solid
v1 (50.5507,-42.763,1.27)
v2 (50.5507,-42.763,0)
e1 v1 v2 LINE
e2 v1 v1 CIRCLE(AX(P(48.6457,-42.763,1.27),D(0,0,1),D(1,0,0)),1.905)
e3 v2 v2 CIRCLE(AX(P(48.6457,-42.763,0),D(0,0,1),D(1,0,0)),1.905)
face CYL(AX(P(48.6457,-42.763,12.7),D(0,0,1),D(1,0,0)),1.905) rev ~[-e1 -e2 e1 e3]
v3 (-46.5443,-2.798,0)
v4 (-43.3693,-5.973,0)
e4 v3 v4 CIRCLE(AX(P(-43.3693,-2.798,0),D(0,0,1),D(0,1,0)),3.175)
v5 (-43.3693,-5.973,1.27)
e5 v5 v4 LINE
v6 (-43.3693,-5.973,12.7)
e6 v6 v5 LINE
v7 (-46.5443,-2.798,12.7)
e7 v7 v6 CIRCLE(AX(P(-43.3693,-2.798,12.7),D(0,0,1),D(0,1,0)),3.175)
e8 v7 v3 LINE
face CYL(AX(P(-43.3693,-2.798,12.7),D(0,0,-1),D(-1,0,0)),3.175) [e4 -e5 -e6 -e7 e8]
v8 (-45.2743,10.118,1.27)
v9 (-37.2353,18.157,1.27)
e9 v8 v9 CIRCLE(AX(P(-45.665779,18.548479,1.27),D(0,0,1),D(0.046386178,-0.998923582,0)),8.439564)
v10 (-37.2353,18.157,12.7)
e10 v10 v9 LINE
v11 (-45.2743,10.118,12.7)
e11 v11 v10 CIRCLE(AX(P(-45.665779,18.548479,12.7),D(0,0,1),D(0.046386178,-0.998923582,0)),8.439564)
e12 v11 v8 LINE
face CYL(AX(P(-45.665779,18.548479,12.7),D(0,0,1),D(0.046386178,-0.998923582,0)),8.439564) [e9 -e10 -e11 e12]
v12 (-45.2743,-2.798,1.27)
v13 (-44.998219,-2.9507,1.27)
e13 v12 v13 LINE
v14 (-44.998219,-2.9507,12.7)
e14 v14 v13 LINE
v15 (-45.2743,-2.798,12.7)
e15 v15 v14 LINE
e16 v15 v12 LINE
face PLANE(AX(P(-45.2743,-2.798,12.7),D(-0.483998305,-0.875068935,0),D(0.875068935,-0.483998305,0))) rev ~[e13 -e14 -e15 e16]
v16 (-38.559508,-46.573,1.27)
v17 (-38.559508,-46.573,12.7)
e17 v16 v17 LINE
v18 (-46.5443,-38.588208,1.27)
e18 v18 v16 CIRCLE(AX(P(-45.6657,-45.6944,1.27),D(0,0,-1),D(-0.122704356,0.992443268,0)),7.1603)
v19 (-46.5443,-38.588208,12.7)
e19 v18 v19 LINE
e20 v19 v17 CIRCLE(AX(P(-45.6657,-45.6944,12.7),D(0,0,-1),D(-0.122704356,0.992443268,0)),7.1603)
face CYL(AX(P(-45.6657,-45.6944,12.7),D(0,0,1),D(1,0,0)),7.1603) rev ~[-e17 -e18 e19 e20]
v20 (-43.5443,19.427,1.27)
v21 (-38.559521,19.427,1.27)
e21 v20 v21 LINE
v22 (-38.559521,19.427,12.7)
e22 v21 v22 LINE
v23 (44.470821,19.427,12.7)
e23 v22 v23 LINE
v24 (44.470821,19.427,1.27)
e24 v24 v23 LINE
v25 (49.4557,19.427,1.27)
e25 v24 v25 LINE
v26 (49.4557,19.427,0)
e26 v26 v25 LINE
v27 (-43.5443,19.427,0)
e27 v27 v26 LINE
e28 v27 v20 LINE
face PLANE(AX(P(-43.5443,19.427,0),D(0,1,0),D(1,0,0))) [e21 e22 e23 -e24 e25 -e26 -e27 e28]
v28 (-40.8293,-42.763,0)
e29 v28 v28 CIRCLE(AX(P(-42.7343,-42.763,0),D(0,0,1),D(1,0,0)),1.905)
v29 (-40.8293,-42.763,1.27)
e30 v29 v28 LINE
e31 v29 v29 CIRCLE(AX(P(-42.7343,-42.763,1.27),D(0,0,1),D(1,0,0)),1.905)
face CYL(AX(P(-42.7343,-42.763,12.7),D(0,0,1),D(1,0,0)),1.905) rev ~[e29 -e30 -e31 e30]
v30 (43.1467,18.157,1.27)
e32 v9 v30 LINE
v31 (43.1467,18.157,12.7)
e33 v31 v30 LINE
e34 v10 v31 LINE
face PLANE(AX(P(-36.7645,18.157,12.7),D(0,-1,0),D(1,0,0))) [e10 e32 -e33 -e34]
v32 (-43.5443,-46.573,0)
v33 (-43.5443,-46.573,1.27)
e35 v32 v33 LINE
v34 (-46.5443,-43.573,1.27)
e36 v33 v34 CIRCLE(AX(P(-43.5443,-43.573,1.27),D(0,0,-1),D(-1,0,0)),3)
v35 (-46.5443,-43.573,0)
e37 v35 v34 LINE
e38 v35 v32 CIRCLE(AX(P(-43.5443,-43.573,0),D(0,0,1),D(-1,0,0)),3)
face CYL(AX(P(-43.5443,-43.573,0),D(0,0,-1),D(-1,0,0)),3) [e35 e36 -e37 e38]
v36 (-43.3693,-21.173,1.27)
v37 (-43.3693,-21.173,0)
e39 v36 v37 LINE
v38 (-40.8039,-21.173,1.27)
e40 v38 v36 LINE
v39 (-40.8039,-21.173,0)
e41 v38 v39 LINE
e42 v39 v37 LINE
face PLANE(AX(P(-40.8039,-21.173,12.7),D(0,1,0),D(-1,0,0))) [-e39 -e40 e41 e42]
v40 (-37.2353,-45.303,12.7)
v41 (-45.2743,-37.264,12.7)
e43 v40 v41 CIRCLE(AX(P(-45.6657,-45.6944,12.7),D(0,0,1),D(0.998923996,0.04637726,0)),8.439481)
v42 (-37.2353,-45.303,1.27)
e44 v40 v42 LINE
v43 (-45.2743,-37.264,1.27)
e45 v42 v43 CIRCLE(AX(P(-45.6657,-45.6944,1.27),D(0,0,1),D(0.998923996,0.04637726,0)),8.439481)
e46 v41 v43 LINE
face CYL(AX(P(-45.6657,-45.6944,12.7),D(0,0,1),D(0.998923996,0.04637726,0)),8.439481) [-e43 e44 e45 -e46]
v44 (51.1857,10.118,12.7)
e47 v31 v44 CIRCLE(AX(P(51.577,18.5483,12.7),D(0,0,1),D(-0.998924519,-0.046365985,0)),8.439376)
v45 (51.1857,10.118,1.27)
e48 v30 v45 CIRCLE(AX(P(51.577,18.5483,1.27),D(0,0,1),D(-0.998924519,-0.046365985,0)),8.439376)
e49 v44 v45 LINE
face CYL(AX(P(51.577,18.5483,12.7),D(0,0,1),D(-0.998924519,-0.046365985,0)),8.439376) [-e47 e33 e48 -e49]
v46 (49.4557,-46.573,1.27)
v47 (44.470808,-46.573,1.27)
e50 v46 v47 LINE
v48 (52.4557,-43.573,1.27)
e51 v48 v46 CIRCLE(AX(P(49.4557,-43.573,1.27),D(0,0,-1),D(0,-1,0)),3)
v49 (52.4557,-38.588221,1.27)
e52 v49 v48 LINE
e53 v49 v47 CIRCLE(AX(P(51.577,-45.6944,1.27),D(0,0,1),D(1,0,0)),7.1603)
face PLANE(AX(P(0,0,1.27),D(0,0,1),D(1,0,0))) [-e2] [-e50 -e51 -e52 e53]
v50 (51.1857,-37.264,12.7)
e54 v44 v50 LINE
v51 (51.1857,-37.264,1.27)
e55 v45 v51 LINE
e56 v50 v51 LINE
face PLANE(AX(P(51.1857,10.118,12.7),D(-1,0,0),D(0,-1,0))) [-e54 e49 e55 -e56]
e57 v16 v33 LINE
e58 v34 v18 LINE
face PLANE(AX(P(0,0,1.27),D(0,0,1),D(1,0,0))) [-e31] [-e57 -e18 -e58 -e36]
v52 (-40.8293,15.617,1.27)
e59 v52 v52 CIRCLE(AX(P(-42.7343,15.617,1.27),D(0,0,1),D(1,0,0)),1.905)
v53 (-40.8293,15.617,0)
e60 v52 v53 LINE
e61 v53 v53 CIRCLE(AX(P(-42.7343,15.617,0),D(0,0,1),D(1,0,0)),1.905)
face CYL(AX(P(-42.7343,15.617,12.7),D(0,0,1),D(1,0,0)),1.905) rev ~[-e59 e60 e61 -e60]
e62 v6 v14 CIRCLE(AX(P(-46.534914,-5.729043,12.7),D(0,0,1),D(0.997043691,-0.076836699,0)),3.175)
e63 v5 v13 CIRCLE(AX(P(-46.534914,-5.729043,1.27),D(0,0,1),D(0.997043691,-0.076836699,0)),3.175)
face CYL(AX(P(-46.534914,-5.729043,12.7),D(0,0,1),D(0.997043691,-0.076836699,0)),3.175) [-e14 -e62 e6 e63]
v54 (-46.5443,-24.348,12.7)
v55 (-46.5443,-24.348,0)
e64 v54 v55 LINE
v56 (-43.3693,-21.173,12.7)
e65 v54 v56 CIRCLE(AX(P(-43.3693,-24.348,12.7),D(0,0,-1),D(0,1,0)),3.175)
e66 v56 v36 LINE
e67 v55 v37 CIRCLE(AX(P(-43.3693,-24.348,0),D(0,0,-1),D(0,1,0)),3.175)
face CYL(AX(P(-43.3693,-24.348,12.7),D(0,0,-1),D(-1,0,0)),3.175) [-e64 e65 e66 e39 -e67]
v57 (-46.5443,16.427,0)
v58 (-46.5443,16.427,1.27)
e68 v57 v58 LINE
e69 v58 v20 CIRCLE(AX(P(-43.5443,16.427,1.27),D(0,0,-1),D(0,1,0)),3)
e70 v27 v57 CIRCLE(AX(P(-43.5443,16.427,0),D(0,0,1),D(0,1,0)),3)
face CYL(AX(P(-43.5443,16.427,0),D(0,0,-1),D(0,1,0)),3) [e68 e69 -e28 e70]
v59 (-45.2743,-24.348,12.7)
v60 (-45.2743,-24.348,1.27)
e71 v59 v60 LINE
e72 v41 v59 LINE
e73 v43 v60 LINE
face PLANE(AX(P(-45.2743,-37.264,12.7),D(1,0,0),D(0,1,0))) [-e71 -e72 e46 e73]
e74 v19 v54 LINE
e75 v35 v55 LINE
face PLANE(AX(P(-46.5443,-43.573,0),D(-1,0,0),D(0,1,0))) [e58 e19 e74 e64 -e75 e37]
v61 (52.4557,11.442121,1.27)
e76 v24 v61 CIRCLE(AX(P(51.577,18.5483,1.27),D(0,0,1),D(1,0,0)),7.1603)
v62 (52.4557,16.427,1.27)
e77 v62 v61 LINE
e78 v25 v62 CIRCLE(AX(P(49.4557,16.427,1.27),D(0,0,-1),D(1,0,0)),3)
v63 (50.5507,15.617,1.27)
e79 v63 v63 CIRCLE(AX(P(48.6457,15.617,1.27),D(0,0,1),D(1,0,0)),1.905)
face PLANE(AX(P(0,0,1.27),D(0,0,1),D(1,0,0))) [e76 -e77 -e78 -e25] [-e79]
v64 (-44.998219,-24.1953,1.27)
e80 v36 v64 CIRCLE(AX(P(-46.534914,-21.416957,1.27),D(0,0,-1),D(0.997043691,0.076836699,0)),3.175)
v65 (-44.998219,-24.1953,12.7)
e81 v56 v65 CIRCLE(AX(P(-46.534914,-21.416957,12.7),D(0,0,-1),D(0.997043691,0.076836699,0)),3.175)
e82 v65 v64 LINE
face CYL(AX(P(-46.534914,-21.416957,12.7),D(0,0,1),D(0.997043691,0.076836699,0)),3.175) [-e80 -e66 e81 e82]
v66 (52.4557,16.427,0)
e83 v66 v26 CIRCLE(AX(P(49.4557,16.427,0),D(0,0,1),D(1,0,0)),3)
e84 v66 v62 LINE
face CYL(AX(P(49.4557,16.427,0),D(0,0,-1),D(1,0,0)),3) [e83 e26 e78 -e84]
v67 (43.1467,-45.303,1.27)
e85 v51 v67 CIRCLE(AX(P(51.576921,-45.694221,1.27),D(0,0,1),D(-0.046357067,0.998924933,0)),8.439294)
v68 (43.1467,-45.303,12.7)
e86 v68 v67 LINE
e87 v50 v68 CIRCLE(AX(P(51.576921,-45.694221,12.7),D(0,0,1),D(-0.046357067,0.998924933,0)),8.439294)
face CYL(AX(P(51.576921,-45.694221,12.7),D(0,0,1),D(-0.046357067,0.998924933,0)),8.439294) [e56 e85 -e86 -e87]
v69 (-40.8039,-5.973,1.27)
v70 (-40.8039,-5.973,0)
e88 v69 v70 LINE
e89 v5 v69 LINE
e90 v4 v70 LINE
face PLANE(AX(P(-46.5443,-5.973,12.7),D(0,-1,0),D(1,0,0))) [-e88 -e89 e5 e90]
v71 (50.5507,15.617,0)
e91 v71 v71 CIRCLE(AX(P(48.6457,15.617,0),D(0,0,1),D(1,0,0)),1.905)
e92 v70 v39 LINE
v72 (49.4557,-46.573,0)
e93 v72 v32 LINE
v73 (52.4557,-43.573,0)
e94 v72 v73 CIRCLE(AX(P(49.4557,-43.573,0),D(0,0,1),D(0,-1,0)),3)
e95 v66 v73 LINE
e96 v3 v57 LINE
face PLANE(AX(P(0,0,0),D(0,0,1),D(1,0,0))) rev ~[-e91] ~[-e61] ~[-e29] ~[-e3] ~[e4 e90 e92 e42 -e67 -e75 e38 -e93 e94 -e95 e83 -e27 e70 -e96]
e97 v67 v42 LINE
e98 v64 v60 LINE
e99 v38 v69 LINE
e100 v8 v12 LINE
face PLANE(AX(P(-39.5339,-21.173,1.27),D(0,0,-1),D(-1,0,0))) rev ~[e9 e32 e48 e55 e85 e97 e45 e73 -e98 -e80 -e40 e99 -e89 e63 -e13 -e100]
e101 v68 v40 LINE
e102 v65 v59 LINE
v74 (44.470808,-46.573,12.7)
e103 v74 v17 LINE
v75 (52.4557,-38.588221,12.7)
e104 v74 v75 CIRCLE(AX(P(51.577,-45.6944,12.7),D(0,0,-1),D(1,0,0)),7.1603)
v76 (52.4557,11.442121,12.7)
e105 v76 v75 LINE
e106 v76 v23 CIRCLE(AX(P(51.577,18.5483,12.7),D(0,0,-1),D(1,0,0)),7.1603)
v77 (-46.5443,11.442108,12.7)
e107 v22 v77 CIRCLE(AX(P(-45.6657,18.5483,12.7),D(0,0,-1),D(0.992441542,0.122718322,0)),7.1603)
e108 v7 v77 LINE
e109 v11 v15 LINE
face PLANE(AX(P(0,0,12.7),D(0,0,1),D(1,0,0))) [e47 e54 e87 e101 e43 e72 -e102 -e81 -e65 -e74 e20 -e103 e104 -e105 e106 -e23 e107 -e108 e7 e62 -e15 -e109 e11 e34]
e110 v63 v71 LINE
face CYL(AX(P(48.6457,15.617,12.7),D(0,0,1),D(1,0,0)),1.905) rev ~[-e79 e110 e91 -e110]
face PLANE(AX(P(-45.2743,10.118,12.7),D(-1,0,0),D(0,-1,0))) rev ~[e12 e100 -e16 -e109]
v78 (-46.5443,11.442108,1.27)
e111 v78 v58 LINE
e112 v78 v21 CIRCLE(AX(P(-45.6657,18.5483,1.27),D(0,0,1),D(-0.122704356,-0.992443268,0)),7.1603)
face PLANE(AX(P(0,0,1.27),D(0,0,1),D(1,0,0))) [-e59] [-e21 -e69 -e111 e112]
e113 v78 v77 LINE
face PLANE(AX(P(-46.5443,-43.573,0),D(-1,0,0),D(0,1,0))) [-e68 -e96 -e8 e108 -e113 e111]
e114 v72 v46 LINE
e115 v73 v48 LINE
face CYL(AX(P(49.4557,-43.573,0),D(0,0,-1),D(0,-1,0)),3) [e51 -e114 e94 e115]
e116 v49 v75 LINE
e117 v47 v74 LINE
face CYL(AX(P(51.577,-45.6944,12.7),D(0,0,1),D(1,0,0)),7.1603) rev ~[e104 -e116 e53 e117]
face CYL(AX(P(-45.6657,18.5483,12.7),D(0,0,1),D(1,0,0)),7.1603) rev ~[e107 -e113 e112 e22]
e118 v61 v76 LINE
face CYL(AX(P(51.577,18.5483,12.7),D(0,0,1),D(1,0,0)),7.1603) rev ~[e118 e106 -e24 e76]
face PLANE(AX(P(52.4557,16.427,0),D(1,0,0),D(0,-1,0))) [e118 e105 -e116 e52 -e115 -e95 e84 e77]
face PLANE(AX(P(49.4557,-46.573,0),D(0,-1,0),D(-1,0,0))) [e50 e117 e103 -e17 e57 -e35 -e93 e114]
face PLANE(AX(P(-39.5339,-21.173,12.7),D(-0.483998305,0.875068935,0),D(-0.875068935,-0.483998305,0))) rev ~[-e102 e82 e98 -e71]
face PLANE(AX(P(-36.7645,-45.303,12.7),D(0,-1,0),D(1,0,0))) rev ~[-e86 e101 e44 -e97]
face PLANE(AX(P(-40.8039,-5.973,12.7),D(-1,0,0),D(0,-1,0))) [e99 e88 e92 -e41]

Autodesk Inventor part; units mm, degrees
ref_plane "YZ Plane" through (0, 0, 0) normal (1, 0, 0) x (0, 1, 0)
ref_plane "XZ Plane" through (0, 0, 0) normal (0, 1, 0) x (-1, 0, 0)
ref_plane "XY Plane" through (0, 0, 0) normal (0, 0, 1) x (1, 0, 0)
sketch "Sketch1" plane through (0, 0, 0) normal (0, 0, 1) x (1, 0, 0)
  line L0 (-43.5443, 19.427) -> (49.4557, 19.427)
  line L1 (52.4557, 16.427) -> (52.4557, -43.573)
  line L2 (49.4557, -46.573) -> (-43.5443, -46.573)
  line L3 (-46.5443, -43.573) -> (-46.5443, 16.427)
  arc A0 (-43.5443, 19.427) -> (-46.5443, 16.427) centre (-43.5443, 16.427) ccw
  arc A1 (-46.5443, -43.573) -> (-43.5443, -46.573) centre (-43.5443, -43.573) ccw
  arc A2 (49.4557, -46.573) -> (52.4557, -43.573) centre (49.4557, -43.573) ccw
  arc A3 (52.4557, 16.427) -> (49.4557, 19.427) centre (49.4557, 16.427) ccw
  point P0 (0, 0)
  point P1 (0, 0)
  point P2 (-46.5443, 19.427)
  point P3 (52.4557, -46.573)
  point P4 (52.4557, 19.427)
  dimension "d0" = 99
  dimension "d1" = 66
  dimension "d2" = 3
extrude "Extrusion1" add sketch "Sketch1" along normal blind 12.7
sketch "Sketch2" plane through (0, 0, 12.7) normal (0, 0, 1) x (1, 0, 0)
  line L0 (-46.5443, 16.427) -> (-46.5443, -43.573) projected
  line L1 (49.4557, 19.427) -> (-43.5443, 19.427) projected
  circle A0 centre (-42.7343, 15.617) radius 1.905
  line L2 (-50.0562, -13.573) -> (79.0191, -13.573) construction
  line L3 (2.9557, 30.2203) -> (2.9557, -48.7988) construction
  circle A1 centre (-42.7343, -42.763) radius 1.905
  circle A2 centre (48.6457, 15.617) radius 1.905
  circle A3 centre (48.6457, -42.763) radius 1.905
  point P0 (0, 0)
  dimension "d8" = 3.81
  dimension "d9" = 3.81
  dimension "d10" = 3.81
  dimension "d50" = 3.81
  dimension "d51" = 3.81
  dimension "d52" = 3.81
extrude "Extrusion2" cut sketch "Sketch2" against normal blind 25.4
sketch "Sketch3" plane through (0, 0, 12.7) normal (0, 0, 1) x (1, 0, 0)
  circle A0 centre (48.6457, 15.617) radius 1.905 projected
  circle A1 centre (-42.7343, 15.617) radius 1.905 projected
  circle A2 centre (-42.7343, -42.763) radius 1.905 projected
  circle A3 centre (48.6457, -42.763) radius 1.905 projected
  line L0 (49.4557, 19.427) -> (-43.5443, 19.427) projected
  arc A4 (-43.5443, 19.427) -> (-46.5443, 16.427) centre (-43.5443, 16.427) ccw projected
  line L1 (-46.5443, 16.427) -> (-46.5443, -43.573) construction
  arc A5 (-46.5443, -43.573) -> (-43.5443, -46.573) centre (-43.5443, -43.573) ccw projected
  line L2 (-43.5443, -46.573) -> (49.4557, -46.573) projected
  arc A6 (49.4557, -46.573) -> (52.4557, -43.573) centre (49.4557, -43.573) ccw projected
  line L3 (52.4557, -43.573) -> (52.4557, 16.427) projected
  arc A7 (52.4557, 16.427) -> (49.4557, 19.427) centre (49.4557, 16.427) ccw projected
  arc A8 (-43.5443, 19.427) -> (-46.5443, 16.427) centre (-43.5443, 16.427) ccw projected
  line L4 (49.4557, 19.427) -> (-43.5443, 19.427) projected
  circle A9 centre (48.6457, 15.617) radius 1.905 projected
  circle A10 centre (-42.7343, 15.617) radius 1.905 projected
  circle A11 centre (-42.7343, -42.763) radius 1.905 projected
  circle A12 centre (48.6457, -42.763) radius 1.905 projected
  arc A13 (52.4557, 16.427) -> (49.4557, 19.427) centre (49.4557, 16.427) ccw projected
  line L5 (52.4557, 16.427) -> (52.4557, -43.573) projected
  arc A14 (49.4557, -46.573) -> (52.4557, -43.573) centre (49.4557, -43.573) ccw projected
  line L6 (49.4557, -46.573) -> (-43.5443, -46.573) projected
  arc A15 (-46.5443, -43.573) -> (-43.5443, -46.573) centre (-43.5443, -43.573) ccw projected
  line L7 (-46.5443, -43.573) -> (-46.5443, 16.427) projected
  arc A16 (-43.5443, 19.427) -> (-46.5443, 16.427) centre (-43.5443, 16.427) ccw projected
  line L8 (-43.5443, 19.427) -> (49.4557, 19.427) projected
  line L9 (-43.5443, 19.427) -> (49.4557, 19.427) projected
  line L10 (-40.8039, 19.427) -> (-40.8039, -46.573) construction
  line L11 (49.4557, -46.573) -> (-43.5443, -46.573) projected
  line L12 (-40.8039, 19.427) -> (-51.3078, 19.427) construction
  line L13 (-40.8039, -46.573) -> (-51.3078, -46.573) construction
  line L14 (-40.8039, -21.173) -> (-51.3078, -21.173) construction
  line L15 (-40.8039, -5.973) -> (-51.3078, -5.973) construction
  line L16 (-46.5443, -43.573) -> (-46.5443, 16.427) projected
  line L17 (-46.5443, -5.973) -> (-40.8039, -5.973)
  line L18 (-40.8039, -5.973) -> (-40.8039, -21.173)
  line L19 (-40.8039, -21.173) -> (-46.5443, -21.173)
  line L20 (-46.5443, -21.173) -> (-46.5443, -5.973)
  point P0 (0, 0)
  dimension "d13" = 25.4
  dimension "d14" = 25.4
  dimension "d15" = 5.7404
extrude "Extrusion3" cut sketch "Sketch3" against normal blind 25.4 contours L17 L18 L19 L7
fillet "Fillet1" radius 3.175 2 edges at (-46.5443, -21.173, 6.35) (-46.5443, -5.973, 6.35)
sketch "Sketch9" plane through (0, 0, 12.7) normal (0, 0, 1) x (1, 0, 0)
  arc A0 (-43.5443, 19.427) -> (-46.5443, 16.427) centre (-43.5443, 16.427) ccw projected
  line L0 (-46.5443, -2.798) -> (-46.5443, 16.427) construction
  line L1 (-46.5443, 16.427) -> (-46.5443, -2.798)
  line L2 (-43.5443, 19.427) -> (-26.5771, 19.427) construction
  line L3 (49.4557, 19.427) -> (-43.5443, 19.427) projected
  line L4 (-45.6657, 18.5483) -> (-26.5771, -0.5403) construction
  line L5 (-45.6657, 18.5483) -> (-18.6704, 18.5483) construction
  circle A1 centre (-45.6657, 18.5483) radius 7.1603
  arc A2 (-46.5443, -2.798) -> (-43.3693, -5.973) centre (-43.3693, -2.798) ccw projected
  line L6 (-43.3693, -5.973) -> (-40.8039, -5.973) projected
  line L7 (-40.8039, -5.973) -> (-40.8039, -21.173) projected
  line L8 (-40.8039, -21.173) -> (-43.3693, -21.173) projected
  arc A3 (-43.3693, -21.173) -> (-46.5443, -24.348) centre (-43.3693, -24.348) ccw projected
  line L9 (-46.5443, -24.348) -> (-46.5443, -43.573) projected
  arc A4 (-46.5443, -43.573) -> (-43.5443, -46.573) centre (-43.5443, -43.573) ccw projected
  line L10 (-43.5443, -46.573) -> (49.4557, -46.573) projected
  arc A5 (49.4557, -46.573) -> (52.4557, -43.573) centre (49.4557, -43.573) ccw projected
  line L11 (52.4557, -43.573) -> (52.4557, 16.427) projected
  arc A6 (52.4557, 16.427) -> (49.4557, 19.427) centre (49.4557, 16.427) ccw projected
  line L12 (49.4557, 19.427) -> (-43.5443, 19.427) projected
  arc A7 (-43.5443, 19.427) -> (-46.5443, 16.427) centre (-43.5443, 16.427) ccw projected
  line L13 (-46.5443, 16.427) -> (-46.5443, -2.798) projected
  circle A8 centre (48.6457, 15.617) radius 1.905 projected
  circle A9 centre (-42.7343, 15.617) radius 1.905 projected
  circle A10 centre (-42.7343, -42.763) radius 1.905 projected
  circle A11 centre (48.6457, -42.763) radius 1.905 projected
  line L14 (-75.7777, -13.573) -> (114.1059, -13.573) construction
  line L15 (2.9557, 31.1348) -> (2.9557, -53.319) construction
  circle A12 centre (-45.6657, -45.6944) radius 7.1603
  line L16 (2.9557, -58.2809) -> (2.9557, 26.1729) construction
  circle A13 centre (51.577, 18.5483) radius 7.1603
  circle A14 centre (51.577, -45.6944) radius 7.1603
  point P0 (0, 0)
  dimension "d28" = 45
extrude "Extrusion5" cut sketch "Sketch9" against normal blind 11.43 contours L3 A1 L1 A0 | A0 L1 A1 L3 | A13 L11 A6 L3 | L3 A6 L11 A13 | A14 L10 A5 L11 | L11 A5 L10 A14 | A12 L9 A4 L10 | L10 A4 L9 A12
sketch "Sketch10" plane through (0, 0, 12.7) normal (0, 0, 1) x (1, 0, 0)
  arc A0 (52.4557, -38.5882) -> (44.4708, -46.573) centre (51.577, -45.6944) ccw projected
  line L0 (52.4557, -38.5882) -> (52.4557, 11.4421) projected
  arc A1 (44.4708, 19.427) -> (52.4557, 11.4421) centre (51.577, 18.5483) ccw projected
  line L1 (44.4708, 19.427) -> (-38.5595, 19.427) projected
  arc A2 (-46.5443, 11.4421) -> (-38.5595, 19.427) centre (-45.6657, 18.5483) ccw projected
  line L2 (-46.5443, 11.4421) -> (-46.5443, -2.798) projected
  arc A3 (-46.5443, -2.798) -> (-43.3693, -5.973) centre (-43.3693, -2.798) ccw projected
  line L3 (-43.3693, -5.973) -> (-40.8039, -5.973) projected
  line L4 (-40.8039, -5.973) -> (-40.8039, -21.173) projected
  line L5 (-40.8039, -21.173) -> (-43.3693, -21.173) projected
  arc A4 (-43.3693, -21.173) -> (-46.5443, -24.348) centre (-43.3693, -24.348) ccw projected
  line L6 (-46.5443, -24.348) -> (-46.5443, -38.5882) projected
  arc A5 (-38.5595, -46.573) -> (-46.5443, -38.5882) centre (-45.6657, -45.6944) ccw projected
  line L7 (-38.5595, -46.573) -> (44.4708, -46.573) projected
  line L8 (-36.7645, -45.303) -> (43.1467, -45.303)
  line L9 (-36.7645, 18.157) -> (43.1467, 18.157)
  line L10 (44.4708, 19.427) -> (-38.5595, 19.427) projected
  line L11 (-36.7645, -45.303) -> (-37.2353, -45.303)
  arc A6 (-38.5595, -46.573) -> (-46.5443, -38.5882) centre (-45.6657, -45.6944) ccw projected
  line L12 (-36.7645, 18.157) -> (-37.2353, 18.157)
  line L13 (51.1857, 10.118) -> (51.1857, -37.264)
  arc A7 (44.4708, 19.427) -> (52.4557, 11.4421) centre (51.577, 18.5483) ccw projected
  line L14 (-39.5339, -5.973) -> (-39.5339, -21.173)
  line L15 (-45.2743, -2.798) -> (-39.5339, -5.973)
  line L16 (-39.5339, -21.173) -> (-45.2743, -24.348)
  line L17 (51.1857, 10.118) -> (52.4557, 10.118) construction
  line L18 (52.4557, -38.5882) -> (52.4557, 11.4421) projected
  line L19 (43.1467, 18.157) -> (43.1467, 19.427) construction
  arc A8 (43.1467, 18.157) -> (51.1857, 10.118) centre (51.577, 18.5483) ccw
  line L20 (-56.5649, -13.573) -> (80.9191, -13.573) construction
  line L21 (2.9557, 34.2968) -> (2.9557, -68.6615) construction
  arc A9 (51.1857, -37.264) -> (43.1467, -45.303) centre (51.577, -45.6944) ccw
  arc A10 (-45.2743, 10.118) -> (-37.2353, 18.157) centre (-45.6657, 18.5483) ccw
  arc A11 (-37.2353, -45.303) -> (-45.2743, -37.264) centre (-45.6657, -45.6944) ccw
  line L22 (-45.2743, 10.118) -> (-45.2743, -2.798)
  line L23 (-45.2743, -37.264) -> (-45.2743, -24.348)
  line L24 (-46.5443, -43.573) -> (-46.5443, -24.348) projected
  point P0 (0, 0)
  dimension "d31" = 1.27
  dimension "d32" = 1.27
  dimension "d35" = 1.27
  dimension "d36" = 1.27
  dimension "d39" = 3.175
  dimension "d40" = 3.175
  dimension "d42" = 1.27
  dimension "d43" = 1.27
  dimension "d44" = 1.2791
extrude "Extrusion6" cut sketch "Sketch10" against normal blind 11.43 contours L11 A11 L23 L16 L14 L15 L22 A10 L12 L9 A8 L13 A9 L8
sketch "Sketch11" plane through (-40.8039, -21.173, 12.7) normal (-1, 0, 0) x (0, 0, 1)
  line L0 (-12.7, 0) -> (-12.7, 15.2) projected
  line L1 (0, 0) -> (-12.7, 0) projected
  line L2 (0, 15.2) -> (0, 0) projected
  line L3 (0, 15.2) -> (-12.7, 15.2) projected
  line L4 (-11.43, 0) -> (-11.43, 15.2) projected
  line L5 (0, 15.2) -> (-11.43, 15.2) projected
  line L6 (0, 0) -> (-11.43, 0) projected
  line L7 (0, 15.2) -> (-11.43, 15.2)
  line L8 (-11.43, 15.2) -> (-11.43, 0)
  line L9 (-11.43, 0) -> (0, 0)
  line L10 (0, 0) -> (0, 15.2)
  point P0 (-12.7, 21.173)
extrude "Extrusion7" cut sketch "Sketch11" against normal blind 7.62 contours L4 L3 L2 L1
fillet "Fillet2" radius 3.175 2 edges at (-39.5339, -21.173, 6.985) (-39.5339, -5.973, 6.985)
properties part number "battbase_final"
